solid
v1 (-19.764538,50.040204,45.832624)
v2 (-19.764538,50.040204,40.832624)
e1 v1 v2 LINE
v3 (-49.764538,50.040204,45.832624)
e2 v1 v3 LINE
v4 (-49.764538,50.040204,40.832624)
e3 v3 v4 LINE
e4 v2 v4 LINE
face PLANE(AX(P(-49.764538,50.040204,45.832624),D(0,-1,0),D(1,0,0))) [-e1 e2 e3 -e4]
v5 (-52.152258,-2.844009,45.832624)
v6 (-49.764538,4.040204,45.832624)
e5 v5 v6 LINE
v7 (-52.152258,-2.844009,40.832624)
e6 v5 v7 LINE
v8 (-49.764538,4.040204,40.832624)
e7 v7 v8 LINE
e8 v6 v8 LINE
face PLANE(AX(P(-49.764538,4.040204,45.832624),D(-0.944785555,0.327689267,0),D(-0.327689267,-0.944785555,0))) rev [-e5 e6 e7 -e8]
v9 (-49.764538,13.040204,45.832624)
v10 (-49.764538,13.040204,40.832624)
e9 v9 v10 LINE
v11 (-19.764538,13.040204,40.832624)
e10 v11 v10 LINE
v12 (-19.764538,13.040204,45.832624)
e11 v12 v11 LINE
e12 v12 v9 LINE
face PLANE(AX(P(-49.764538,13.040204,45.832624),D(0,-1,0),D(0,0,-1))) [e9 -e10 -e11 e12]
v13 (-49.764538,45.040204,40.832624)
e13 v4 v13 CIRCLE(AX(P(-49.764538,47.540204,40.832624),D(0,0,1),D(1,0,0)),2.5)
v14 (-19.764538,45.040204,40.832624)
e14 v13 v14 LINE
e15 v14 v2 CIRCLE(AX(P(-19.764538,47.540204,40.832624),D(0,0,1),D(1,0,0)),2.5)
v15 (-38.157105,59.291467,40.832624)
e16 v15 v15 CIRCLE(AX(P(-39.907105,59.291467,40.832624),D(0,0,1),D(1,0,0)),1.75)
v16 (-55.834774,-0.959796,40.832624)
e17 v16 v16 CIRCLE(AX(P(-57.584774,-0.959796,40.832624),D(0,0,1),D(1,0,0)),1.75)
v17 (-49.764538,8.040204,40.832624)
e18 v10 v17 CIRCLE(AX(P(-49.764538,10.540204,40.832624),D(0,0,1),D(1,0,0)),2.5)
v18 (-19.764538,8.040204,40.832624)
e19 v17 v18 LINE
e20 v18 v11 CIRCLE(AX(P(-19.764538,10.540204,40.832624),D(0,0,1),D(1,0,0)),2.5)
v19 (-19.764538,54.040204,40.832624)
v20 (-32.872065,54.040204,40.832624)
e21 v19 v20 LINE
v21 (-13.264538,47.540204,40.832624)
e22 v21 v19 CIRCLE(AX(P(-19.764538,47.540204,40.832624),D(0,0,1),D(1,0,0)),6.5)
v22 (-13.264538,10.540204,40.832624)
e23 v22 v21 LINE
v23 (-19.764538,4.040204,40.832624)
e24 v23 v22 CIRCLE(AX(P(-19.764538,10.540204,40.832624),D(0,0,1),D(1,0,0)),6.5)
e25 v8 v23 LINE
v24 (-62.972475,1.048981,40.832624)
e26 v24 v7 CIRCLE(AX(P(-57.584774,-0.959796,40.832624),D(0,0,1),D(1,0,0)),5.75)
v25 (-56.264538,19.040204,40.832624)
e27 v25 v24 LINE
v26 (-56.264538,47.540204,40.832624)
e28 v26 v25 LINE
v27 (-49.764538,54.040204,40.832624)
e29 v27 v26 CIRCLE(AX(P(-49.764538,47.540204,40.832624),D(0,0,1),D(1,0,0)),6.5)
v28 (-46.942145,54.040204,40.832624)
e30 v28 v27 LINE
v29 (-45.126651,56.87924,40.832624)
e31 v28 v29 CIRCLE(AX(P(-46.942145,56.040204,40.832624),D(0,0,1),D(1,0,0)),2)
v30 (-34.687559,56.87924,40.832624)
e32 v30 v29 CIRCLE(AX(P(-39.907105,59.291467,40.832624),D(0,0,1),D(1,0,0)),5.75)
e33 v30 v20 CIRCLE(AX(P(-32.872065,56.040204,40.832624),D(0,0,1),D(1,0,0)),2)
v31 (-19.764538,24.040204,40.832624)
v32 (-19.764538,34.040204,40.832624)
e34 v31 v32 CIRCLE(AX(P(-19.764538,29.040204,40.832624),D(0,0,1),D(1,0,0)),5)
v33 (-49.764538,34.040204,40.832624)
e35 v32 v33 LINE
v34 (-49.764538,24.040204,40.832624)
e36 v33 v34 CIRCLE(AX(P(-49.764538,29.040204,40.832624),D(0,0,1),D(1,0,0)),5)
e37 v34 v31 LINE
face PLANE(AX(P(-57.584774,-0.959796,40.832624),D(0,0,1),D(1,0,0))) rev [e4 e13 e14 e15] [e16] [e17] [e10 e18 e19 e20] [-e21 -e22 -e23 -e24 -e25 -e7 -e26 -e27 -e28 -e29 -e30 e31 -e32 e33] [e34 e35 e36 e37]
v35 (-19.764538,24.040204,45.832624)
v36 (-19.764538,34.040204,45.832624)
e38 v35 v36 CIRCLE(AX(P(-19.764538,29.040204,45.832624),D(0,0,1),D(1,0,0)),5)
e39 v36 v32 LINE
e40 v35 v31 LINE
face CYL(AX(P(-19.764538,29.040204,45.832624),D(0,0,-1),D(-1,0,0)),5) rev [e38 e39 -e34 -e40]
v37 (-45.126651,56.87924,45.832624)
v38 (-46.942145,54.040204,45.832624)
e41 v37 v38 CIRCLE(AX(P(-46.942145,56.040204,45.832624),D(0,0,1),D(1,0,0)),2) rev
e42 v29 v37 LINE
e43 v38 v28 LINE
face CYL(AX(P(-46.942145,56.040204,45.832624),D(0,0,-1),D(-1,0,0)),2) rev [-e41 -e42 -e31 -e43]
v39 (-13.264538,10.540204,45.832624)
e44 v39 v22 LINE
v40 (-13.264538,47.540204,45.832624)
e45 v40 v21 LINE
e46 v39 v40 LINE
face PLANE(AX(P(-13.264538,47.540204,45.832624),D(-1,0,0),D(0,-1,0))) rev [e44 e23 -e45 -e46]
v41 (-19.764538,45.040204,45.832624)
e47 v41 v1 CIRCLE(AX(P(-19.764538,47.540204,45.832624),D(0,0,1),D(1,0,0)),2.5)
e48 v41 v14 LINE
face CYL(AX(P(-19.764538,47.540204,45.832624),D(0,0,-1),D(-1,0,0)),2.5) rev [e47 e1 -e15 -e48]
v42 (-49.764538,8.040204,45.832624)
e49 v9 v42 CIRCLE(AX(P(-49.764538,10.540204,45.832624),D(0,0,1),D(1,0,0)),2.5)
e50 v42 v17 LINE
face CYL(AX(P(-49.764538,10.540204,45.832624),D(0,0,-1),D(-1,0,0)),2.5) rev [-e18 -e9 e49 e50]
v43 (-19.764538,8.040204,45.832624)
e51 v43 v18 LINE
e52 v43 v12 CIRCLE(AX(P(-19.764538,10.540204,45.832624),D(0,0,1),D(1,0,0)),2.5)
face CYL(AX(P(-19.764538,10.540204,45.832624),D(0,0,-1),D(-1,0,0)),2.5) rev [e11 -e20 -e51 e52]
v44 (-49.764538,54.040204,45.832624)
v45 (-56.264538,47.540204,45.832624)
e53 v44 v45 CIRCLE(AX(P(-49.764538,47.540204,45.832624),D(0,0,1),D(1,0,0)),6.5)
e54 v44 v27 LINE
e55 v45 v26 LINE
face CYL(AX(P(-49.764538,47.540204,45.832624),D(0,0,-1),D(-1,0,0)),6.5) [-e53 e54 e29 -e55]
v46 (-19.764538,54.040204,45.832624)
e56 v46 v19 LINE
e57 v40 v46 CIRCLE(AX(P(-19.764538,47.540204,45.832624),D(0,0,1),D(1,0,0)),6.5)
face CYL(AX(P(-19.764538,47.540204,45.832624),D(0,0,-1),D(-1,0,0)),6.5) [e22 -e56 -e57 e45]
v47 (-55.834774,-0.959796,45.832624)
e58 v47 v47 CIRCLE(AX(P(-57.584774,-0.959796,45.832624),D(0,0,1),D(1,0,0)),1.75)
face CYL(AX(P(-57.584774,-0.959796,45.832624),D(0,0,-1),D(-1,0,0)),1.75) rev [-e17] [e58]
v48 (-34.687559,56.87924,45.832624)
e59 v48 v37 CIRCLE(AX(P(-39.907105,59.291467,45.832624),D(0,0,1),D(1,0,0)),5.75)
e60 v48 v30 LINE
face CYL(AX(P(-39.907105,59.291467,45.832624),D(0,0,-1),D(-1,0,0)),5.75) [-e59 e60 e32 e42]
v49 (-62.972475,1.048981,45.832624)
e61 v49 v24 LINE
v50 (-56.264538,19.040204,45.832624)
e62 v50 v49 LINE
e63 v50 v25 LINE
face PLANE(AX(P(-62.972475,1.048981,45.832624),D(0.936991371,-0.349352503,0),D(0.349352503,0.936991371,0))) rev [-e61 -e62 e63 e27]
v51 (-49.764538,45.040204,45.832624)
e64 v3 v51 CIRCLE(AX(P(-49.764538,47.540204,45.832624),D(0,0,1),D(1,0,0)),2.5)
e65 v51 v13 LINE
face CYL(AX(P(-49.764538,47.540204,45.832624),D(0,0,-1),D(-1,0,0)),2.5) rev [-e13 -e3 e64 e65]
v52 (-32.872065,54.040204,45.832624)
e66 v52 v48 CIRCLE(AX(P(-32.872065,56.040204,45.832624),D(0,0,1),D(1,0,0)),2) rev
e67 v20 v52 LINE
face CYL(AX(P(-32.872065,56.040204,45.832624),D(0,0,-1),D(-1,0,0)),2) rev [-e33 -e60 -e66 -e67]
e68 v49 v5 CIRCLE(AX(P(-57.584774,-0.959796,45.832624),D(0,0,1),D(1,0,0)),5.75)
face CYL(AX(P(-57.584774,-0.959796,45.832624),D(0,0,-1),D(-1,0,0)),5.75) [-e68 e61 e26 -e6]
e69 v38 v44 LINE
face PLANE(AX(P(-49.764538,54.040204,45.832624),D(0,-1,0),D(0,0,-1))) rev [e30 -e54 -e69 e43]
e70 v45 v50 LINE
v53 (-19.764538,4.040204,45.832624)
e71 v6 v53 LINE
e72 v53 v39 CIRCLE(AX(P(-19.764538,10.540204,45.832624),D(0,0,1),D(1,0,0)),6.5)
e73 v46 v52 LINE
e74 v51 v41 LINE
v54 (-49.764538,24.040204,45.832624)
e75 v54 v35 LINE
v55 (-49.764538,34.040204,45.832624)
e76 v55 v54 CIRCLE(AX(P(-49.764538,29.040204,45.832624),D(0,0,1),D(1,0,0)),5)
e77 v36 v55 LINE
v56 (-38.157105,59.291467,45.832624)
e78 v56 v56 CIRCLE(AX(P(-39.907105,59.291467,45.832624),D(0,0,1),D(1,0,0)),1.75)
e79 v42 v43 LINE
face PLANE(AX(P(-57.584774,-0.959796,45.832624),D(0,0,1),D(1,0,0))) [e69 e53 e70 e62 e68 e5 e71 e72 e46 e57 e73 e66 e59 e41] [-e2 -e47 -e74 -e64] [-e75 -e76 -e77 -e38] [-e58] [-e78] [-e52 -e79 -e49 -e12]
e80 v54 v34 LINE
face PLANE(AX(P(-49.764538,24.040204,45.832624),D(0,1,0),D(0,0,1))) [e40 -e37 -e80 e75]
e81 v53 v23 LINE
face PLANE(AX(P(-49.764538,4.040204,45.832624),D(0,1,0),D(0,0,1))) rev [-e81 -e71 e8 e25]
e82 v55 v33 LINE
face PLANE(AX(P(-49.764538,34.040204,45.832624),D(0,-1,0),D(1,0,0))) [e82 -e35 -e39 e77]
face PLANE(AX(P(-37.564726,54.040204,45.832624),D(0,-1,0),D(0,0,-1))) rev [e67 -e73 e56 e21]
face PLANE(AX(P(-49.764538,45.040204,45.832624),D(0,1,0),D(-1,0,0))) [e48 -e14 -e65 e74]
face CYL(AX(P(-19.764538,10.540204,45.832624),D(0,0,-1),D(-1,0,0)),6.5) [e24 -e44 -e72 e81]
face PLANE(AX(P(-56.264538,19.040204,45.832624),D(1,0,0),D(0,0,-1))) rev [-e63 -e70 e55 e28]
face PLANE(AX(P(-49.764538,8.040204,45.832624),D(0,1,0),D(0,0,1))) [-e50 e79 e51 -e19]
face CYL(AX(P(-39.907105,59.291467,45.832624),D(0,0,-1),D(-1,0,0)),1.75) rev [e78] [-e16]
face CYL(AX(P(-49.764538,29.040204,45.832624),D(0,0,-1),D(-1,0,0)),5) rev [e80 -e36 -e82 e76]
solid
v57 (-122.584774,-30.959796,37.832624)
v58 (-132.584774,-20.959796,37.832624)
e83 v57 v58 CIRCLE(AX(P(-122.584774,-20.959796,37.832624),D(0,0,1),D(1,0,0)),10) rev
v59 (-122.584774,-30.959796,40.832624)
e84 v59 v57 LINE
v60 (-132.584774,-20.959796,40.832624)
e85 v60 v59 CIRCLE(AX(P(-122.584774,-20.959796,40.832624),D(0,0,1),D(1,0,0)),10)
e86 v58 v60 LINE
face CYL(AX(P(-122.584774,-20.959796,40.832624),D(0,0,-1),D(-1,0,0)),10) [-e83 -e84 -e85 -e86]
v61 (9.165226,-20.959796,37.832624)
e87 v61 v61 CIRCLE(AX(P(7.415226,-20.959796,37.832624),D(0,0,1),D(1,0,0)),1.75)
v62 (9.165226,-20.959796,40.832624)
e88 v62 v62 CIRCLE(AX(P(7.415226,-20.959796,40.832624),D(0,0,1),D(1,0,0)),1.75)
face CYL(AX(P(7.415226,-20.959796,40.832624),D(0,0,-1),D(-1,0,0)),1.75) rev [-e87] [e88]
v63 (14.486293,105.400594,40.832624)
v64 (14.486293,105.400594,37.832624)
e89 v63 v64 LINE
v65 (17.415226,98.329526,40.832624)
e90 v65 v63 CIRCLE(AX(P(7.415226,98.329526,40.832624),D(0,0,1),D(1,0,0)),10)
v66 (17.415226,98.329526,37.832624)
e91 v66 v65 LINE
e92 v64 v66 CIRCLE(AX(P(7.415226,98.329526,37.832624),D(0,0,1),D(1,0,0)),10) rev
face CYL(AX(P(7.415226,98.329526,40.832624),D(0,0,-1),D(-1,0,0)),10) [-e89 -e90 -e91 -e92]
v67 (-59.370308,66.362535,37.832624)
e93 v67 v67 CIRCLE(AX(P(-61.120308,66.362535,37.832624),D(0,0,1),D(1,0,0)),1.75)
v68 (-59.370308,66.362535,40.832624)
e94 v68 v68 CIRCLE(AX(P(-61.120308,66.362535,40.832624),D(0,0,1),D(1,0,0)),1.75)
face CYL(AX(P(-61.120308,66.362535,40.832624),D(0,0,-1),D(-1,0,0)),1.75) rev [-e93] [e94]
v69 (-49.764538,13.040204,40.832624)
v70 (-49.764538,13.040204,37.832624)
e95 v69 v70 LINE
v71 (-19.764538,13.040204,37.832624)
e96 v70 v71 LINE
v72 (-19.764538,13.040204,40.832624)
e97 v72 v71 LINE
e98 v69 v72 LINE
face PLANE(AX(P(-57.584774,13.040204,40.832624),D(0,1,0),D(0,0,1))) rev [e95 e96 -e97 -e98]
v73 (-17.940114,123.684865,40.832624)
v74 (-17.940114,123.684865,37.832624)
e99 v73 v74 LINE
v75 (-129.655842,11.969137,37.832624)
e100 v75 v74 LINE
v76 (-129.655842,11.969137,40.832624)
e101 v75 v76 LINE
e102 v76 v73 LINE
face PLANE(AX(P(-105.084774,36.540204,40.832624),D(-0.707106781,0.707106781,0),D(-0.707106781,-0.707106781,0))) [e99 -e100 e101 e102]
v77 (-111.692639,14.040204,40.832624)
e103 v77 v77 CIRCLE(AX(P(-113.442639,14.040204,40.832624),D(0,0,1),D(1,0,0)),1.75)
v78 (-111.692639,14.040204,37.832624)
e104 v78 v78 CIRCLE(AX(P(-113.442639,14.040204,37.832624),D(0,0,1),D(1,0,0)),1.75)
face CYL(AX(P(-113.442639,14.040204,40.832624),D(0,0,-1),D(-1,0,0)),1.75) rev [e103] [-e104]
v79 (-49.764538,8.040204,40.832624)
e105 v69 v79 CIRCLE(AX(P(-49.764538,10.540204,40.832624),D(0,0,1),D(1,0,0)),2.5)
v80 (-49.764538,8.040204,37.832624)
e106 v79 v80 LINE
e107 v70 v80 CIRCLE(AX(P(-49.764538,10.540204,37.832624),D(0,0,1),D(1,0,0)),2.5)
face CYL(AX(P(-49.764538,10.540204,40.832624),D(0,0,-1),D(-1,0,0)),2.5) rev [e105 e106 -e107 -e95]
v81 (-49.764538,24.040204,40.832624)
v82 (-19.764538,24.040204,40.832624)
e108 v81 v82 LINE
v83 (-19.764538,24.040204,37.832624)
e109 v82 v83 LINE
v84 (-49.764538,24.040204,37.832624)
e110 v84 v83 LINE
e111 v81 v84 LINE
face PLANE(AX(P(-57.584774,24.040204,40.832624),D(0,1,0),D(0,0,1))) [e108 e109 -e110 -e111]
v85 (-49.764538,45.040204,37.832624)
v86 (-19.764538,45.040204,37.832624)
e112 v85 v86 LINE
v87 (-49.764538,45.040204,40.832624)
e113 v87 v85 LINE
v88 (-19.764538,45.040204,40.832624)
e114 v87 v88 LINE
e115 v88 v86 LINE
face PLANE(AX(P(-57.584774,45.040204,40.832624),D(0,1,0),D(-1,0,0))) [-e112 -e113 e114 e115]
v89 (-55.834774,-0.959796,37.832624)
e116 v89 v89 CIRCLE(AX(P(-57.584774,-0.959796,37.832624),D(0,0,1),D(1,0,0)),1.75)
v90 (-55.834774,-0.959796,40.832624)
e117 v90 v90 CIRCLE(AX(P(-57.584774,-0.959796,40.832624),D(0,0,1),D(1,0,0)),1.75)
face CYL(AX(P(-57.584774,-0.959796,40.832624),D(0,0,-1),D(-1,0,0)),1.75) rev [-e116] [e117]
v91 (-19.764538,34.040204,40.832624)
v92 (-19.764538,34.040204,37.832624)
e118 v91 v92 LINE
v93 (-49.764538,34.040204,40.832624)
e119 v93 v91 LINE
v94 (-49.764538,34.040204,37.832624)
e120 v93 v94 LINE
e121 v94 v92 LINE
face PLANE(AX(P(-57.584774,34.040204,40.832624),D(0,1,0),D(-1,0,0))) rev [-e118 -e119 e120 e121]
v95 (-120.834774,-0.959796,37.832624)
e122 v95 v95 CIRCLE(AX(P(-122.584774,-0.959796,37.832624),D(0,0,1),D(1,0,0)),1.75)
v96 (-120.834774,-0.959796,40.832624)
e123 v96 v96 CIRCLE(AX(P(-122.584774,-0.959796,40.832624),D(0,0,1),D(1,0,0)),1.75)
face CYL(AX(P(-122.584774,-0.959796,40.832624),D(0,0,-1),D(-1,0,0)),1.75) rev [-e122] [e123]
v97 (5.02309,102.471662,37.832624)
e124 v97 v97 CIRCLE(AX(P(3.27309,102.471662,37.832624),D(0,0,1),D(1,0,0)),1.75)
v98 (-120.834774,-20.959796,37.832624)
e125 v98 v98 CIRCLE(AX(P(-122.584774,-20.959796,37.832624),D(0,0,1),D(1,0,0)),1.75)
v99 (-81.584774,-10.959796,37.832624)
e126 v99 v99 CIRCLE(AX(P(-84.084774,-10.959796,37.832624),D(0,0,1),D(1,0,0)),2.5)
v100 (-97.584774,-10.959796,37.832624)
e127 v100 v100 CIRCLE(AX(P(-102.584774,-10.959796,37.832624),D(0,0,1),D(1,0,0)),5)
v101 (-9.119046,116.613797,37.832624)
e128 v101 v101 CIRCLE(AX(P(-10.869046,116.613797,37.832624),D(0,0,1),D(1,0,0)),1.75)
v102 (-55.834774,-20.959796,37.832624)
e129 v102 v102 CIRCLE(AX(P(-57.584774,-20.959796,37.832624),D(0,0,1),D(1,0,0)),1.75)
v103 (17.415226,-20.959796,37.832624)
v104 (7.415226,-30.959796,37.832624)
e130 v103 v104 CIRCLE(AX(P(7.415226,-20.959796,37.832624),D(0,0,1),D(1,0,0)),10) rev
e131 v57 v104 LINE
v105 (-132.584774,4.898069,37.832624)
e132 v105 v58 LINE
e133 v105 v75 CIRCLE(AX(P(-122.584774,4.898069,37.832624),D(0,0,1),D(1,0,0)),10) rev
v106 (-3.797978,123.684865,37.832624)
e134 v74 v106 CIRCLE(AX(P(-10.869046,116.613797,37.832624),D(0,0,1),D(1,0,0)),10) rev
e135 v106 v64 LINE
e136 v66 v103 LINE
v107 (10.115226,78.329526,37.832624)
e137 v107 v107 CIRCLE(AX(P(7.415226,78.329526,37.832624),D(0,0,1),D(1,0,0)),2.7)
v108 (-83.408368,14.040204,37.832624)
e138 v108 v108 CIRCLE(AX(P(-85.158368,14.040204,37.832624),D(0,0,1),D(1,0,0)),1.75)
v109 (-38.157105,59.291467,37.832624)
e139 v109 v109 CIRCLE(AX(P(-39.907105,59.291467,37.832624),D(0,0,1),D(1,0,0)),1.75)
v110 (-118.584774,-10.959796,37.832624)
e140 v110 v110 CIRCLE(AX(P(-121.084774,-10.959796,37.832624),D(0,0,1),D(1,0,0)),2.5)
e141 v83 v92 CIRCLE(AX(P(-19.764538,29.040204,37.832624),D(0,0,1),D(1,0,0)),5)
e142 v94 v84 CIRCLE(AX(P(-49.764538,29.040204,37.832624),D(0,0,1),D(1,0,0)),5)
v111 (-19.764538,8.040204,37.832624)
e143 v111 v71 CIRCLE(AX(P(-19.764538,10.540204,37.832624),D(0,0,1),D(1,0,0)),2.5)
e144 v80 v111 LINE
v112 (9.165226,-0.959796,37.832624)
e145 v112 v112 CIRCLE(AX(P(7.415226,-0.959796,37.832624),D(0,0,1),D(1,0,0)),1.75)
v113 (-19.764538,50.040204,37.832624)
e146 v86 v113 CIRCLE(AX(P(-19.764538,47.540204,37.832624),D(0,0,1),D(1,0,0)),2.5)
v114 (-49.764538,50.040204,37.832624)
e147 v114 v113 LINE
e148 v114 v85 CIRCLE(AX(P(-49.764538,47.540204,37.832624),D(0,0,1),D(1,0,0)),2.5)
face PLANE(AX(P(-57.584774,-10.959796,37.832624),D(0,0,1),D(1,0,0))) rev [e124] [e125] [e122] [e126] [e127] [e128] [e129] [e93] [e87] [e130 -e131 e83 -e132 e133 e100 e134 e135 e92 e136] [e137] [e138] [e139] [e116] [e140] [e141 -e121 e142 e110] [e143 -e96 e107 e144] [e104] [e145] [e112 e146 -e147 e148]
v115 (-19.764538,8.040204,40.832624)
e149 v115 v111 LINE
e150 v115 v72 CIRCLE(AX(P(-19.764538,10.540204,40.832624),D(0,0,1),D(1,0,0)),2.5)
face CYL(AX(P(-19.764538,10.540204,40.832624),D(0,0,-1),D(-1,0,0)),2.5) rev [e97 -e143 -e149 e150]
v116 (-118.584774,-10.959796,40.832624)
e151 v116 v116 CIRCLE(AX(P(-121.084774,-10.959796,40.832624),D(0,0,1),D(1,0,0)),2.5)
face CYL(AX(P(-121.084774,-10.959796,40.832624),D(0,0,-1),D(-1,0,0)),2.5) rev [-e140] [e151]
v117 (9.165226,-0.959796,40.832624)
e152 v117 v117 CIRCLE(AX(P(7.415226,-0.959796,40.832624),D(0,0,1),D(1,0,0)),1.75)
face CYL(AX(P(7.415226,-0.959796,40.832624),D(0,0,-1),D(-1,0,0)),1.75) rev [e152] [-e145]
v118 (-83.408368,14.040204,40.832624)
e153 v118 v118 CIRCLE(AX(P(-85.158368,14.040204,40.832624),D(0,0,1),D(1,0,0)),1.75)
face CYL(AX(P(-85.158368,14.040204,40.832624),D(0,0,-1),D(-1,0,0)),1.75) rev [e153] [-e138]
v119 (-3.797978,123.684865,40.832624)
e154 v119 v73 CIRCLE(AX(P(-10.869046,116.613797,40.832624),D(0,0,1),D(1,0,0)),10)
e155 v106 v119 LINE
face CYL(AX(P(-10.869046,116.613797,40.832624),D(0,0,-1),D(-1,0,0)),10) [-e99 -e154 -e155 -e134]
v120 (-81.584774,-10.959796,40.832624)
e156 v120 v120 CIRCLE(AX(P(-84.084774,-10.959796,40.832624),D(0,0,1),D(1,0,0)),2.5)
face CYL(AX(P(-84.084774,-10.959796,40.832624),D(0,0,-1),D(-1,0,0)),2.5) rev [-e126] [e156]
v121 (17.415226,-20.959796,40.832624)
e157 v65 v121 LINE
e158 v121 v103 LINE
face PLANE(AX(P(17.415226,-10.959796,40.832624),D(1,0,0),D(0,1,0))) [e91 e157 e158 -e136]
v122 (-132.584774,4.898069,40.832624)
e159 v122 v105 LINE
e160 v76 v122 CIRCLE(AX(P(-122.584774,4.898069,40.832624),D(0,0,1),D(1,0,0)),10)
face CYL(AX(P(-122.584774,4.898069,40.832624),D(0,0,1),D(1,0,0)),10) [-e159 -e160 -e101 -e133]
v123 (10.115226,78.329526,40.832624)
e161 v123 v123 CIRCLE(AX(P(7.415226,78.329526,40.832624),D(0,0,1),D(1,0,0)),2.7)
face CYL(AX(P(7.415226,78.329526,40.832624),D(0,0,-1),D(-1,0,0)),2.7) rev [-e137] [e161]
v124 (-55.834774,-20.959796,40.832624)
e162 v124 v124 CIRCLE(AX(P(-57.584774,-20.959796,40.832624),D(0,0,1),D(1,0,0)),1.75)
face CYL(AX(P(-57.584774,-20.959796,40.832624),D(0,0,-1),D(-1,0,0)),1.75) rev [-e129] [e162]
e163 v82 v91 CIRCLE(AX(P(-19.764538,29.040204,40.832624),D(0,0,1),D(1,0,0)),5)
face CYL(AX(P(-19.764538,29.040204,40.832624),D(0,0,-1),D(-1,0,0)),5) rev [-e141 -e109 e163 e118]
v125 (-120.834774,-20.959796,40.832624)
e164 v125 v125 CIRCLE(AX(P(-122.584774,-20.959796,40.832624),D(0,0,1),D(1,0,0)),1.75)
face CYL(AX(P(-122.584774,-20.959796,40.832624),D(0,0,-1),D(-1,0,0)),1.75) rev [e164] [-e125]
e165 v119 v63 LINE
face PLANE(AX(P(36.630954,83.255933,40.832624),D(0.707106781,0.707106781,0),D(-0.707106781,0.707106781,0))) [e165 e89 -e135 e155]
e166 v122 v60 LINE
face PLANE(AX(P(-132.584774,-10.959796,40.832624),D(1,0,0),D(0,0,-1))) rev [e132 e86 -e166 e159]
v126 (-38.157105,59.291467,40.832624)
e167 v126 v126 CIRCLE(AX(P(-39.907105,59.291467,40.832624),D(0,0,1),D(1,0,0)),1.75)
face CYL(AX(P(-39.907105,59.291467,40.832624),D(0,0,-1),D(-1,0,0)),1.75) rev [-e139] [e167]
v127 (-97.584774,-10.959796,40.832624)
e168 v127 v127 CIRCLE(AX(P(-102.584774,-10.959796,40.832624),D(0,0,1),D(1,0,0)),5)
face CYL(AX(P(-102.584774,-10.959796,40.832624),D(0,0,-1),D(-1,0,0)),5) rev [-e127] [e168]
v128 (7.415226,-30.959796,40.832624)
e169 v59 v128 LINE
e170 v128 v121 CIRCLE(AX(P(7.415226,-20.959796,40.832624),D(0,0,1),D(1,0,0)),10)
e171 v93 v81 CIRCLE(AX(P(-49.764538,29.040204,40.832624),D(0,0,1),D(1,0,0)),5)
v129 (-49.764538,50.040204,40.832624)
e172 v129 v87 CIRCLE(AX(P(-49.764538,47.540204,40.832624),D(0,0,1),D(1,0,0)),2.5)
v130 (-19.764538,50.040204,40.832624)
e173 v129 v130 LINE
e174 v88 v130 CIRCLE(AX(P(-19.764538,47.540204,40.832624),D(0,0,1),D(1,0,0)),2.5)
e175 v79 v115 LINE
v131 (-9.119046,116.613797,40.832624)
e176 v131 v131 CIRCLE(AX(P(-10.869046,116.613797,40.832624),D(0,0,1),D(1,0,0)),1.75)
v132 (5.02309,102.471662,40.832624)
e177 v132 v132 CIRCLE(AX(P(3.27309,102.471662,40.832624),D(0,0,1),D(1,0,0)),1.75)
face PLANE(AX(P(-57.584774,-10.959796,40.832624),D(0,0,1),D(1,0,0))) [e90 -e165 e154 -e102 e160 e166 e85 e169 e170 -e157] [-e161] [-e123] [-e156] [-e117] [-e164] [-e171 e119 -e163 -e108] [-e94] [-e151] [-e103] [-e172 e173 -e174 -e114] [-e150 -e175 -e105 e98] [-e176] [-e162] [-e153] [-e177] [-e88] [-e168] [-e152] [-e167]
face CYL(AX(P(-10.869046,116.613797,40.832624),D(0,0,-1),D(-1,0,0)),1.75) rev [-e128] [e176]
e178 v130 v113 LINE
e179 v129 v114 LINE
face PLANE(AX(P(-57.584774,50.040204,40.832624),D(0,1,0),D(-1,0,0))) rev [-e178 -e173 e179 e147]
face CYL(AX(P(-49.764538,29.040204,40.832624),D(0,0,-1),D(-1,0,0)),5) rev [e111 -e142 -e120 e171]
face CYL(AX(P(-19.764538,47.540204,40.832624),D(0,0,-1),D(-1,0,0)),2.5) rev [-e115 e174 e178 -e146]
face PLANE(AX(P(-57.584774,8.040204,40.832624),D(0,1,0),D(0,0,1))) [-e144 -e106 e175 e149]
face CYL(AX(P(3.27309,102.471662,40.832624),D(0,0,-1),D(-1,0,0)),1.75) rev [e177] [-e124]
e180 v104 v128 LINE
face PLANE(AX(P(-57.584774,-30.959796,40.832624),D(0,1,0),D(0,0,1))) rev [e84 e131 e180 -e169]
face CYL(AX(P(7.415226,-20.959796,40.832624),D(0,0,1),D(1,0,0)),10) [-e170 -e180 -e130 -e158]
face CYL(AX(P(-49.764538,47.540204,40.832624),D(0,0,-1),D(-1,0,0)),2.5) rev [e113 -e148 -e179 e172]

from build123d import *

# Parameters (mm, degrees)
FRAME_BRACKET_ALU_START       = 37.832624059
FRAME_BRACKET_ALU_OUTLINE_R   = 1.75
FRAME_BRACKET_ALU_OUTLINE_R_2 = 2.5
FRAME_BRACKET_ALU_OUTLINE_R_3 = 5
FRAME_BRACKET_ALU_OUTLINE_R_4 = 2.7
FRAME_BRACKET_ALU_DEPTH       = 3
SKETCH1_R                     = 1.75
BOSS_EXTRUDE1_DEPTH           = 5
FILLET1_R                     = 2


# Read off the part's stored shape, not the designer's step: frame_bracket_alu
with BuildPart() as part:
    # frame_bracket_alu outline → frame_bracket_alu (new body)
    with BuildSketch(Plane.XY.offset(FRAME_BRACKET_ALU_START)):
        with BuildLine():
            ThreePointArc((7.415225557, -30.959795658), (14.486293369, -28.03086347), (17.415225557, -20.959795658))
            Line((17.415225557, -20.959795658), (17.415225557, 98.329526223))
            ThreePointArc((17.415225557, 98.329526223), (16.654020882, 102.156360547), (14.486293369, 105.400594035))
            Line((14.486293369, 105.400594035), (-3.797977879, 123.684865282))
            ThreePointArc((-3.797977879, 123.684865282), (-10.86904569, 126.61379747), (-17.940113502, 123.684865282))
            Line((-17.940113502, 123.684865282), (-129.655842255, 11.96913653))
            ThreePointArc((-129.655842255, 11.96913653), (-131.823569768, 8.724903042), (-132.584774443, 4.898068718))
            Line((-132.584774443, 4.898068718), (-132.584774443, -20.959795658))
            ThreePointArc((-132.584774443, -20.959795658), (-129.655842255, -28.03086347), (-122.584774443, -30.959795658))
            Line((-122.584774443, -30.959795658), (7.415225557, -30.959795658))
        make_face()
        with Locations((-122.584774443, -20.959795658)):
            Circle(FRAME_BRACKET_ALU_OUTLINE_R, mode=Mode.SUBTRACT)
        with Locations((-121.084774443, -10.959795658)):
            Circle(FRAME_BRACKET_ALU_OUTLINE_R_2, mode=Mode.SUBTRACT)
        with Locations((-122.584774443, -0.959795658)):
            Circle(FRAME_BRACKET_ALU_OUTLINE_R, mode=Mode.SUBTRACT)
        with Locations((-102.584774443, -10.959795658)):
            Circle(FRAME_BRACKET_ALU_OUTLINE_R_3, mode=Mode.SUBTRACT)
        with Locations((-84.084774443, -10.959795658)):
            Circle(FRAME_BRACKET_ALU_OUTLINE_R_2, mode=Mode.SUBTRACT)
        with Locations((-113.442638819, 14.040204342)):
            Circle(FRAME_BRACKET_ALU_OUTLINE_R, mode=Mode.SUBTRACT)
        with Locations((-85.158367572, 14.040204342)):
            Circle(FRAME_BRACKET_ALU_OUTLINE_R, mode=Mode.SUBTRACT)
        with Locations((-57.584774443, -20.959795658)):
            Circle(FRAME_BRACKET_ALU_OUTLINE_R, mode=Mode.SUBTRACT)
        with Locations((-57.584774443, -0.959795658)):
            Circle(FRAME_BRACKET_ALU_OUTLINE_R, mode=Mode.SUBTRACT)
        with Locations((7.415225557, -20.959795658)):
            Circle(FRAME_BRACKET_ALU_OUTLINE_R, mode=Mode.SUBTRACT)
        with Locations((7.415225557, -0.959795658)):
            Circle(FRAME_BRACKET_ALU_OUTLINE_R, mode=Mode.SUBTRACT)
        with BuildLine():
            Line((-49.764538098, 13.040204342), (-19.764538098, 13.040204342))
            ThreePointArc((-19.764538098, 13.040204342), (-17.264538098, 10.540204342), (-19.764538098, 8.040204342))
            Line((-19.764538098, 8.040204342), (-49.764538098, 8.040204342))
            ThreePointArc((-49.764538098, 8.040204342), (-52.264538098, 10.540204342), (-49.764538098, 13.040204342))
        make_face(mode=Mode.SUBTRACT)
        with BuildLine():
            Line((-49.764538098, 34.040204342), (-19.764538098, 34.040204342))
            ThreePointArc((-19.764538098, 34.040204342), (-14.764538098, 29.040204342), (-19.764538098, 24.040204342))
            Line((-19.764538098, 24.040204342), (-49.764538098, 24.040204342))
            ThreePointArc((-49.764538098, 24.040204342), (-54.764538098, 29.040204342), (-49.764538098, 34.040204342))
        make_face(mode=Mode.SUBTRACT)
        with BuildLine():
            Line((-49.764538098, 50.040204342), (-19.764538098, 50.040204342))
            ThreePointArc((-19.764538098, 50.040204342), (-17.264538098, 47.540204342), (-19.764538098, 45.040204342))
            Line((-19.764538098, 45.040204342), (-49.764538098, 45.040204342))
            ThreePointArc((-49.764538098, 45.040204342), (-52.264538098, 47.540204342), (-49.764538098, 50.040204342))
        make_face(mode=Mode.SUBTRACT)
        with Locations((-61.120308349, 66.362534812)):
            Circle(FRAME_BRACKET_ALU_OUTLINE_R, mode=Mode.SUBTRACT)
        with Locations((-39.907104913, 59.291467)):
            Circle(FRAME_BRACKET_ALU_OUTLINE_R, mode=Mode.SUBTRACT)
        with Locations((7.415225557, 78.329526223)):
            Circle(FRAME_BRACKET_ALU_OUTLINE_R_4, mode=Mode.SUBTRACT)
        with Locations((3.273089933, 102.471661847)):
            Circle(FRAME_BRACKET_ALU_OUTLINE_R, mode=Mode.SUBTRACT)
        with Locations((-10.86904569, 116.61379747)):
            Circle(FRAME_BRACKET_ALU_OUTLINE_R, mode=Mode.SUBTRACT)
    extrude(amount=FRAME_BRACKET_ALU_DEPTH)


with BuildPart() as body_2:
    # Sketch1 → Boss-Extrude1 (new body)
    with BuildSketch(Plane.XY.offset(40.832624059)):
        with BuildLine():
            Line((-49.764538098, 4.040204342), (-19.764538098, 4.040204342))
            ThreePointArc((-19.764538098, 4.040204342), (-15.16834402, 5.944010264), (-13.264538098, 10.540204342))
            Line((-13.264538098, 10.540204342), (-13.264538098, 29.040204342))
            Line((-13.264538098, 29.040204342), (-13.264538098, 47.540204342))
            ThreePointArc((-13.264538098, 47.540204342), (-15.16834402, 52.136398419), (-19.764538098, 54.040204342))
            Line((-19.764538098, 54.040204342), (-37.564725676, 54.040204342))
            ThreePointArc((-37.564725676, 54.040204342), (-39.907104913, 65.041467), (-42.249484151, 54.040204342))
            Line((-42.249484151, 54.040204342), (-49.764538098, 54.040204342))
            ThreePointArc((-49.764538098, 54.040204342), (-54.360732176, 52.136398419), (-56.264538098, 47.540204342))
            Line((-56.264538098, 47.540204342), (-56.264538098, 29.040204342))
            Line((-56.264538098, 29.040204342), (-56.264538098, 19.040204342))
            Line((-56.264538098, 19.040204342), (-62.972474824, 1.048981235))
            ThreePointArc((-62.972474824, 1.048981235), (-59.53139851, -6.370262805), (-52.152257503, -2.844008942))
            Line((-52.152257503, -2.844008942), (-49.764538098, 4.040204342))
        make_face()
        with Locations((-57.584774443, -0.959795658)):
            Circle(SKETCH1_R, mode=Mode.SUBTRACT)
        with Locations((-39.907104913, 59.291467)):
            Circle(SKETCH1_R, mode=Mode.SUBTRACT)
        with BuildLine():
            Line((-49.764538098, 8.040204342), (-19.764538098, 8.040204342))
            ThreePointArc((-19.764538098, 8.040204342), (-17.264538098, 10.540204342), (-19.764538098, 13.040204342))
            Line((-19.764538098, 13.040204342), (-49.764538098, 13.040204342))
            ThreePointArc((-49.764538098, 13.040204342), (-52.264538098, 10.540204342), (-49.764538098, 8.040204342))
        make_face(mode=Mode.SUBTRACT)
        with BuildLine():
            Line((-49.764538098, 24.040204342), (-19.764538098, 24.040204342))
            ThreePointArc((-19.764538098, 24.040204342), (-14.764538098, 29.040204342), (-19.764538098, 34.040204342))
            Line((-19.764538098, 34.040204342), (-49.764538098, 34.040204342))
            ThreePointArc((-49.764538098, 34.040204342), (-54.764538098, 29.040204342), (-49.764538098, 24.040204342))
        make_face(mode=Mode.SUBTRACT)
        with BuildLine():
            Line((-49.764538098, 45.040204342), (-19.764538098, 45.040204342))
            ThreePointArc((-19.764538098, 45.040204342), (-17.264538098, 47.540204342), (-19.764538098, 50.040204342))
            Line((-19.764538098, 50.040204342), (-49.764538098, 50.040204342))
            ThreePointArc((-49.764538098, 50.040204342), (-52.264538098, 47.540204342), (-49.764538098, 45.040204342))
        make_face(mode=Mode.SUBTRACT)
    extrude(amount=BOSS_EXTRUDE1_DEPTH)

    # Fillet1
    fillet1_edges = [body_2.edges().sort_by_distance(p)[0] for p in [
        (-42.249484151, 54.040204342, 43.332624059),
        (-37.564725676, 54.040204342, 43.332624059),
    ]]
    fillet(fillet1_edges, radius=FILLET1_R)


solid = Compound([part.part, body_2.part])
